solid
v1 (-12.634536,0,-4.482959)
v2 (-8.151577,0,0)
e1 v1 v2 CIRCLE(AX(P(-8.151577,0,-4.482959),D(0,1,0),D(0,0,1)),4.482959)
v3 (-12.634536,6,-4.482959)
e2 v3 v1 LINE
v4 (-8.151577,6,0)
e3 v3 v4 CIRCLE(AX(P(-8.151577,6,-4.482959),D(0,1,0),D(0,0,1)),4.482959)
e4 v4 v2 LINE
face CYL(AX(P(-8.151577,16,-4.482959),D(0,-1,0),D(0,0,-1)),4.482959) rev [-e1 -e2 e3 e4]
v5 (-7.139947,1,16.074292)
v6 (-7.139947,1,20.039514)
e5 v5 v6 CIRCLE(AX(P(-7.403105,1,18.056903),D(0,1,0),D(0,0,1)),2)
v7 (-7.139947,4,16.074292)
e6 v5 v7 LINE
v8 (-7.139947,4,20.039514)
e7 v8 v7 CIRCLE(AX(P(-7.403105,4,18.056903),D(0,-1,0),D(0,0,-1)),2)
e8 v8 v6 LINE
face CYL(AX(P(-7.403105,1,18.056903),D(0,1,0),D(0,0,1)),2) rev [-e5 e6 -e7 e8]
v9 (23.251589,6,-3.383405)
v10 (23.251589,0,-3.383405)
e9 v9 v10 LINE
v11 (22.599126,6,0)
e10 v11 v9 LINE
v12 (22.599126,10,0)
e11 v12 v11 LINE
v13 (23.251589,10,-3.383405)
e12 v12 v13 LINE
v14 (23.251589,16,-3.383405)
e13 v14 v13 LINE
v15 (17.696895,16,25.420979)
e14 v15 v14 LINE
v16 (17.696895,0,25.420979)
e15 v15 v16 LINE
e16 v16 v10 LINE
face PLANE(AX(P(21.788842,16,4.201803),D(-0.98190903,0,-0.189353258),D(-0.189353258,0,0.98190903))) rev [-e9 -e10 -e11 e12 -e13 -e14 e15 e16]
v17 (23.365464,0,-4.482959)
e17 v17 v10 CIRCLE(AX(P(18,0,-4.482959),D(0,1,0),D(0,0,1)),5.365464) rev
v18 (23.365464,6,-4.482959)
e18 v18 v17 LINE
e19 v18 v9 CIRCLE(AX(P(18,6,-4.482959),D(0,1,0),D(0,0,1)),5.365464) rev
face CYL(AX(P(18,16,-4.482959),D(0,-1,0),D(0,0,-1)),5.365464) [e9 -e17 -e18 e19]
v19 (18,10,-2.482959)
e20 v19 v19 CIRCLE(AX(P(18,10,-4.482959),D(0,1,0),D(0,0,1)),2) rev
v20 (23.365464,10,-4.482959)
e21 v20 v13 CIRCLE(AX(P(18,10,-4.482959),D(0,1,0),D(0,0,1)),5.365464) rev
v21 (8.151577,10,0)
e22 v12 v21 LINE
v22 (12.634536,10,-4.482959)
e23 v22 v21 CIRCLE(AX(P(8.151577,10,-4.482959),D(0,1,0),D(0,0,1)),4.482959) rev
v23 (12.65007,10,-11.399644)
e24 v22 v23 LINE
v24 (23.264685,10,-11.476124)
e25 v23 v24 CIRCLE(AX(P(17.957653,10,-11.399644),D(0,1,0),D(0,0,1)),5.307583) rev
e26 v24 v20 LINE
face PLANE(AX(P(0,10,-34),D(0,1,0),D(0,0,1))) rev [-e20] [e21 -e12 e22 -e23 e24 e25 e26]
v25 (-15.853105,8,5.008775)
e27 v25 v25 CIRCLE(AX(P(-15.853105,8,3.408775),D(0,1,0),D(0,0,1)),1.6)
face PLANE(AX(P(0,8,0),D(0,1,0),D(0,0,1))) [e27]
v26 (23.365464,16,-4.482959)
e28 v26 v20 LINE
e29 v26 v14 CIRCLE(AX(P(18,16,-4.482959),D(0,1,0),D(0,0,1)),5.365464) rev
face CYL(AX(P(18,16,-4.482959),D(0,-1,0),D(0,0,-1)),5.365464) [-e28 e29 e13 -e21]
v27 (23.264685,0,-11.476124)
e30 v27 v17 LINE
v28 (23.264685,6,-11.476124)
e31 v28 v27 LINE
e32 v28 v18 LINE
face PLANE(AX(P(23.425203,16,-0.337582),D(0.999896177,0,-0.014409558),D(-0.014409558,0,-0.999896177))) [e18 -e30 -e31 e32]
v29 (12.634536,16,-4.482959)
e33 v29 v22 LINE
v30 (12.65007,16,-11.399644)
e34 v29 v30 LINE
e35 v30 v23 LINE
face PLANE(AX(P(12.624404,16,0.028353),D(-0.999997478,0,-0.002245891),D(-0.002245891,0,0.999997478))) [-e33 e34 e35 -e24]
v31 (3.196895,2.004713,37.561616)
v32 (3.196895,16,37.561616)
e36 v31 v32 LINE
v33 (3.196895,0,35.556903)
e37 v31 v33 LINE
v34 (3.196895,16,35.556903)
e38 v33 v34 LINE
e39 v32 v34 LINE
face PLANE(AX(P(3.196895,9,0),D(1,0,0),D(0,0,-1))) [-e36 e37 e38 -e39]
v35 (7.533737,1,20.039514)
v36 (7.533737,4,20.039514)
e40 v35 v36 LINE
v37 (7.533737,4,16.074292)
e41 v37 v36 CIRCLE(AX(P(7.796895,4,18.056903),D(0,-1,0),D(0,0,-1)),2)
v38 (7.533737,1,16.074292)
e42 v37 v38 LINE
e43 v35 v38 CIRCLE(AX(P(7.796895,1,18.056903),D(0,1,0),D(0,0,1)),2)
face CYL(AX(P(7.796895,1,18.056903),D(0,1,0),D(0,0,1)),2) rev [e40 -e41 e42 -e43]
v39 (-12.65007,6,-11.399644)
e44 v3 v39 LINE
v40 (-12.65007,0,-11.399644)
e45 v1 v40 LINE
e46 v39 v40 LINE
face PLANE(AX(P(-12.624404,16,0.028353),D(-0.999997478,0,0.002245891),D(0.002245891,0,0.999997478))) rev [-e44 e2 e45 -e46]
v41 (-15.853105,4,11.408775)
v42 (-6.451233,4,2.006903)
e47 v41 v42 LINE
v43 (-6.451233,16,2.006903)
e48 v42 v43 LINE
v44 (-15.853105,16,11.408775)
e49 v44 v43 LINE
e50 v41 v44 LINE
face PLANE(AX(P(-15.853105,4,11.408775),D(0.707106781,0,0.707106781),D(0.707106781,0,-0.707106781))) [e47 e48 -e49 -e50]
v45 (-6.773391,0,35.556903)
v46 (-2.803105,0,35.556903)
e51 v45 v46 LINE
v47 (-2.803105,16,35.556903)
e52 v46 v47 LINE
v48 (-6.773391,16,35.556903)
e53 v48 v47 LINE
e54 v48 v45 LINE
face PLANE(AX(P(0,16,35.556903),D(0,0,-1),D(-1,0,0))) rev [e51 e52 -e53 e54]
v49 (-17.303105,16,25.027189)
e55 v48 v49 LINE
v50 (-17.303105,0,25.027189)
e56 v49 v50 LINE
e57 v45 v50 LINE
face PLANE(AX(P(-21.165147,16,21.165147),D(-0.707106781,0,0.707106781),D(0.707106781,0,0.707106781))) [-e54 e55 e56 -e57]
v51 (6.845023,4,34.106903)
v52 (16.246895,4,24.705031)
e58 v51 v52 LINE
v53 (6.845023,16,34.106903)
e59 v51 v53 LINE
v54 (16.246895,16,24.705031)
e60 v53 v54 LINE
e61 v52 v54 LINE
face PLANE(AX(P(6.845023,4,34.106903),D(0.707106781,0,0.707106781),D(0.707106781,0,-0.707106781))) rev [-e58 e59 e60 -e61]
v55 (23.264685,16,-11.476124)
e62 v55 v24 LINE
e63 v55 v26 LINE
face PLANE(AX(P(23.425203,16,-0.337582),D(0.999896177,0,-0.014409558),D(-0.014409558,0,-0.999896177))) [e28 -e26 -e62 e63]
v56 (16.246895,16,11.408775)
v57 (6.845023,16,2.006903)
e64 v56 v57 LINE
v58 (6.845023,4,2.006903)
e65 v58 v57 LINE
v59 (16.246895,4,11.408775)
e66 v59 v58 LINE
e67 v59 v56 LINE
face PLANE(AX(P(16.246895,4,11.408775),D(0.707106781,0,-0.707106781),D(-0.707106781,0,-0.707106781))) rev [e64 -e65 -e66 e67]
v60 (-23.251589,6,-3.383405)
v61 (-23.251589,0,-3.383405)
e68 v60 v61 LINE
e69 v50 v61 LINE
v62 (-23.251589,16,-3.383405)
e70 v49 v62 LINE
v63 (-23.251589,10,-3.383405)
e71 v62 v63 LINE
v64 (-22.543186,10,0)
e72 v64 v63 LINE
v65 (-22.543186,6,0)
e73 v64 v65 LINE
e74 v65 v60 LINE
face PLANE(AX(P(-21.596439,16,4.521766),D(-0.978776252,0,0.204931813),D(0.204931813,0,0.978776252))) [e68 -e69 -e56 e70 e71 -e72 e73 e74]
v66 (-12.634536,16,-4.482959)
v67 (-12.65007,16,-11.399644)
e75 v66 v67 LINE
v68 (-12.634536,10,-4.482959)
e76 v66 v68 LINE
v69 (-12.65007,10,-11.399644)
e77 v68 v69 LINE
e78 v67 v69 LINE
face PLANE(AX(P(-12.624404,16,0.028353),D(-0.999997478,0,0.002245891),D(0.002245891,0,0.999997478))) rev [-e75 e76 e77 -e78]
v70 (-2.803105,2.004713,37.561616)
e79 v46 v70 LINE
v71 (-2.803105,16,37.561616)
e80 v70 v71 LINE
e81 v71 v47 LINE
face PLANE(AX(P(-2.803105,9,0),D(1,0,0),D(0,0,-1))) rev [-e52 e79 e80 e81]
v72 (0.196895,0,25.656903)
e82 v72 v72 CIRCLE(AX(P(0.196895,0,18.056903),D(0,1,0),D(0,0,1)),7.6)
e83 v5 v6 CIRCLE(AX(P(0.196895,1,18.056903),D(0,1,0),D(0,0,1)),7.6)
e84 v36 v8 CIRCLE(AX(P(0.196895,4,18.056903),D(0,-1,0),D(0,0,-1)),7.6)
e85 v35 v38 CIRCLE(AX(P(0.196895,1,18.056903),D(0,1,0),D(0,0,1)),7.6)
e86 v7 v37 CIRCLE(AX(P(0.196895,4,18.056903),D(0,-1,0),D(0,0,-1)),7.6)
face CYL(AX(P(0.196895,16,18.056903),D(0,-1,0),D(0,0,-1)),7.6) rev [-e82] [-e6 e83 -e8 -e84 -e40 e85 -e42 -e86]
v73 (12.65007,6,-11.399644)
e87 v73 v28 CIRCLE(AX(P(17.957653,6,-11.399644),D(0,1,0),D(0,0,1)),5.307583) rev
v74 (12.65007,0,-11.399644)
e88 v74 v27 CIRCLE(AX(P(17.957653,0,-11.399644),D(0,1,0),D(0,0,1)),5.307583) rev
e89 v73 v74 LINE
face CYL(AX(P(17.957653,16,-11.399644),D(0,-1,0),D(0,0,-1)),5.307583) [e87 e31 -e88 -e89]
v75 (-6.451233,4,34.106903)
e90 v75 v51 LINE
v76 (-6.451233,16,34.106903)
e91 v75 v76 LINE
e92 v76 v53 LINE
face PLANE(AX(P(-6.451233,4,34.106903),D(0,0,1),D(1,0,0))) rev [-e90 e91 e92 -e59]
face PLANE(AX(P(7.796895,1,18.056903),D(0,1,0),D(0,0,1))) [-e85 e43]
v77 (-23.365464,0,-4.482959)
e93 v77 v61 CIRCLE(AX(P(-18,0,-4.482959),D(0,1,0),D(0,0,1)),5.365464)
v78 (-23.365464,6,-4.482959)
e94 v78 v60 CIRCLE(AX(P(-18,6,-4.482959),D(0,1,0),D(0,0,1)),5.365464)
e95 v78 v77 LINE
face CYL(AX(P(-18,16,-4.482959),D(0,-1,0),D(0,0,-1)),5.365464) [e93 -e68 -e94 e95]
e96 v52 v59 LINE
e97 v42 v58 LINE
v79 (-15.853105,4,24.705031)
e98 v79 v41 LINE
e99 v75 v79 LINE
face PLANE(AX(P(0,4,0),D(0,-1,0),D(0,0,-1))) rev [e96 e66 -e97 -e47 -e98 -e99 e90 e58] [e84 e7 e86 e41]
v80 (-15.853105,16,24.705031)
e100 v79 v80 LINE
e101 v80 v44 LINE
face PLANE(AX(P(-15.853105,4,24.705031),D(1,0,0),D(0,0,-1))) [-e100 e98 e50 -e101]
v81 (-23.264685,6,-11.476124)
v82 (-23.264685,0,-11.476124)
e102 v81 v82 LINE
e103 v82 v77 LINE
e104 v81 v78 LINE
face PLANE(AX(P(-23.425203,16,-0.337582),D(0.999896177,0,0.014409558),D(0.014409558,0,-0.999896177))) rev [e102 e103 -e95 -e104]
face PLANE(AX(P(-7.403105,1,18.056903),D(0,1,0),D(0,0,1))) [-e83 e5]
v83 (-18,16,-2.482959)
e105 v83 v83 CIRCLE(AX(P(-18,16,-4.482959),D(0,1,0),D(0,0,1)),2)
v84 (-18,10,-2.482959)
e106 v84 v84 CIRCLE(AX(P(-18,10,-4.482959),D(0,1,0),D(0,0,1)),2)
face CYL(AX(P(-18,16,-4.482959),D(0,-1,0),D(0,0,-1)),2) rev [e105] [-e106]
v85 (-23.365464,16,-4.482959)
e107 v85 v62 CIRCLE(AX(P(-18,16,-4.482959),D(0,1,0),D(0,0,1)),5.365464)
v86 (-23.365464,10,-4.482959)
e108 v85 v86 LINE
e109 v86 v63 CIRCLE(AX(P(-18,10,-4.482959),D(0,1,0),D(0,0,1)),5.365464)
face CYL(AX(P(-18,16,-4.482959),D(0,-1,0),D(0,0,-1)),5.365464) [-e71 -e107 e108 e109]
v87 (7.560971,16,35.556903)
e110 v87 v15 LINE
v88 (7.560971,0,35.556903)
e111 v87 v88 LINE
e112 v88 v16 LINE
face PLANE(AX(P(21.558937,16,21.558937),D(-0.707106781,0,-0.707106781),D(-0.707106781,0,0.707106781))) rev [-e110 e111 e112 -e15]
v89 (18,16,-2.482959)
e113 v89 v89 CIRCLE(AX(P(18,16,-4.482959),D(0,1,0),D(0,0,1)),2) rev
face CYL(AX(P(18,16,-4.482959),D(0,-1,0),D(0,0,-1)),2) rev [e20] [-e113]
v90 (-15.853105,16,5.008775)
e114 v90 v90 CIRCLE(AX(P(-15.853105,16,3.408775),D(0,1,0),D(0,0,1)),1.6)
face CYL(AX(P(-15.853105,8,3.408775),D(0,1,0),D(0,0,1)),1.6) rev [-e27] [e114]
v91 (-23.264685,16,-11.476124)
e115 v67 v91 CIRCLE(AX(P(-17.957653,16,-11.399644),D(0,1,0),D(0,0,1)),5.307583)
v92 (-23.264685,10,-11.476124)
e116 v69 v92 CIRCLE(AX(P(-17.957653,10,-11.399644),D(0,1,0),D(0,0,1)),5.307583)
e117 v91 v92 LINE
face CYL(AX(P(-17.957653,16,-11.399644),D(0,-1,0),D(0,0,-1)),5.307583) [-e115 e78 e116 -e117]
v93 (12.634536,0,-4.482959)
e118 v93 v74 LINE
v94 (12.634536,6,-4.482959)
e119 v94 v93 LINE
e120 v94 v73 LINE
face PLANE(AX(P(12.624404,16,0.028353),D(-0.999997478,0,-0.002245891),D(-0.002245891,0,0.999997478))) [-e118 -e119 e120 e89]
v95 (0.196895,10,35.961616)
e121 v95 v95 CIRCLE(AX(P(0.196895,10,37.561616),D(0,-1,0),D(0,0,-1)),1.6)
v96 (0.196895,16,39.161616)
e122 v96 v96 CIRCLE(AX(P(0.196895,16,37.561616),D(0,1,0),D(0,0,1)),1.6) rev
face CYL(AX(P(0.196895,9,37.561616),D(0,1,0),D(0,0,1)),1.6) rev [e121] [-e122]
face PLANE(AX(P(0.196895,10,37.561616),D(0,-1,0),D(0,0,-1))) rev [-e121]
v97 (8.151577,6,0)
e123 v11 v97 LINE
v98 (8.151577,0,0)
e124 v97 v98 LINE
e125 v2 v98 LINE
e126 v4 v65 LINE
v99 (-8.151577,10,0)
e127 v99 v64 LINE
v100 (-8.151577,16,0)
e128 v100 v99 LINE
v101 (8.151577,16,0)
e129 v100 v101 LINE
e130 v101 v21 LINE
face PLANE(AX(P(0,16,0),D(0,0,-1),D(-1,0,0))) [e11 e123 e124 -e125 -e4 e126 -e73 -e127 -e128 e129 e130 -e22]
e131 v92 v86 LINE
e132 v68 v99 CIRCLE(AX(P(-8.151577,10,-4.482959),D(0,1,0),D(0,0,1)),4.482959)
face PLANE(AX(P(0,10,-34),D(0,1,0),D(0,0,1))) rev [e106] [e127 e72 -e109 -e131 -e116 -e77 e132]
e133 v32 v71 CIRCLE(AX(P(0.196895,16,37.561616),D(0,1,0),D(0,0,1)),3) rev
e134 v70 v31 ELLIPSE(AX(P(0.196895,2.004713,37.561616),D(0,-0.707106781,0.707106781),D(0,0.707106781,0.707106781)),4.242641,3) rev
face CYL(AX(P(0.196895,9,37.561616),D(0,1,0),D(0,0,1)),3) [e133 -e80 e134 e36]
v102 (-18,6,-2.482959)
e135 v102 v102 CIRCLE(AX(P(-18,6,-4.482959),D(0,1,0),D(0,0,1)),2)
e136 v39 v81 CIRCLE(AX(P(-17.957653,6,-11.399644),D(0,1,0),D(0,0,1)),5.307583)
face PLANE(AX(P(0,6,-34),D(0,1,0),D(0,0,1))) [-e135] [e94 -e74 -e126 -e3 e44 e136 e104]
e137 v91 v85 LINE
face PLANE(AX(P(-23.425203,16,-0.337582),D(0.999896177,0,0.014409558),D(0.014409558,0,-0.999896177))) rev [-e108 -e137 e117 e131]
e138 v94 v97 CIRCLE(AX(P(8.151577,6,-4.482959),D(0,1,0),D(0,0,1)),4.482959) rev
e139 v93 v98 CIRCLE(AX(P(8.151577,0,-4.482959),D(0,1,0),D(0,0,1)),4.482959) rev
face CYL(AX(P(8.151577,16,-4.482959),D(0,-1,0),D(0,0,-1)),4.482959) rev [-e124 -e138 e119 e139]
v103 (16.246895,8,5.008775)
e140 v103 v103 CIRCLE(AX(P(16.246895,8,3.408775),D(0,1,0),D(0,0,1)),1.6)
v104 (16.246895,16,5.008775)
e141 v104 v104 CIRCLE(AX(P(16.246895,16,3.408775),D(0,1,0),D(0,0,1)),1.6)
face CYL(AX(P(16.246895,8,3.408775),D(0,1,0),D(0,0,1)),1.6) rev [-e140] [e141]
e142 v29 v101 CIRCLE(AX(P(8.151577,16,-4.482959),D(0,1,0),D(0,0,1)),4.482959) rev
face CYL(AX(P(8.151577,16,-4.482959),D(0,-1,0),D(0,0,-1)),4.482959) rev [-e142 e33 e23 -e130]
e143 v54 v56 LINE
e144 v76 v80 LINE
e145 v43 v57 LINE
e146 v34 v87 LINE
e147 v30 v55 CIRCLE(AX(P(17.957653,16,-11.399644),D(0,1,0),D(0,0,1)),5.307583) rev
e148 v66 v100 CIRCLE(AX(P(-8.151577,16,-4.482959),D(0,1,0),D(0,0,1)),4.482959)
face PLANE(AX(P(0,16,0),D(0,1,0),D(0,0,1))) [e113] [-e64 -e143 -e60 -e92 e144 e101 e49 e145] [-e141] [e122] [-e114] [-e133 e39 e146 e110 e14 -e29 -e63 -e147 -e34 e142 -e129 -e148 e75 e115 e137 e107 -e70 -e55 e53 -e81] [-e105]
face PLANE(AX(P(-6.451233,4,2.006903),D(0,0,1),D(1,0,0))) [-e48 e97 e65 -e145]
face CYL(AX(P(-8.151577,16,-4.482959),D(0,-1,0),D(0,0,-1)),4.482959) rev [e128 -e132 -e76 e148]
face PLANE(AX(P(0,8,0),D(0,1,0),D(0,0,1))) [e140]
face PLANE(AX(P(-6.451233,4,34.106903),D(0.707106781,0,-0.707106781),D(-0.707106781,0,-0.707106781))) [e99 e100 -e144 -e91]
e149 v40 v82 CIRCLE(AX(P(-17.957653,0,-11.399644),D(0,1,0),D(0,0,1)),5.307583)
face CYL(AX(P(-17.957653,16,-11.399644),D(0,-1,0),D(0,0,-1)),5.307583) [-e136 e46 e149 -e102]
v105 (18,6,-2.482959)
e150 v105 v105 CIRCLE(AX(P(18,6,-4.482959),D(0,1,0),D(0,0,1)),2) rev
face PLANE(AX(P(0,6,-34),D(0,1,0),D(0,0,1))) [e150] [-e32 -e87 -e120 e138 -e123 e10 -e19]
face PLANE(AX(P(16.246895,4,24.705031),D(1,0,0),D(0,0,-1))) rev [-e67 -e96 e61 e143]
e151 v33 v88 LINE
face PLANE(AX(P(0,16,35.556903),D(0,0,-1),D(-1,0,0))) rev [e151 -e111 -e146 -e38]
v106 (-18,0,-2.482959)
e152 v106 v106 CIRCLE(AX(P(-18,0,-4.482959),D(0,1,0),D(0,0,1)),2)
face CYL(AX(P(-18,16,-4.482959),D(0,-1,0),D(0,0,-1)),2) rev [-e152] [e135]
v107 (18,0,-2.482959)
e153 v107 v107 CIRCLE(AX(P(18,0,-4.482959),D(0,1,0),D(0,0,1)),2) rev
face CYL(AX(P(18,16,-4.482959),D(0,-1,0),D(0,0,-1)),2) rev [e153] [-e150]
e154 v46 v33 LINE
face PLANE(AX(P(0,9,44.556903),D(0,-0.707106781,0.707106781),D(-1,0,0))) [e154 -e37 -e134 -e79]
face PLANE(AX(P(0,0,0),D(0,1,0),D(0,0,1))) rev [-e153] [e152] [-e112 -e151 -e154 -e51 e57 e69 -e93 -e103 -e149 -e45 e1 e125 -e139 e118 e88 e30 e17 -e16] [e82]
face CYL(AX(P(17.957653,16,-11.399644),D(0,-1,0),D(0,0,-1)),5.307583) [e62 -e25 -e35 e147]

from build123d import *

# Parameters (mm, degrees)
SKETCH1_R            = 7.6
SKETCH1_R_2          = 2
BOSS_EXTRUDE2_DEPTH  = 16
CUT_EXTRUDE1_DEPTH   = 12
SKETCH3_R            = 2
CUT_EXTRUDE2_DEPTH   = 3
SKETCH4_W            = 19.148912363
SKETCH4_H            = 4
SKETCH4_W_2          = 1.506114963
SKETCH4_H_2          = 2
SKETCH4_W_3          = 17.088400717
CUT_EXTRUDE3_DEPTH   = 34
SKETCH5_R            = 1.6
CUT_EXTRUDE4_DEPTH   = 8
SKETCH6_R            = 1.6
BOSS_EXTRUDE4_DEPTH  = 7
BOSS_EXTRUDE7_START  = -1
SKETCH9_R            = 1.6
BOSS_EXTRUDE7_DEPTH  = 1
CHAMFER2_START       = 5.004712753
CHAMFER2_DEPTH       = 3.995287247
CHAMFER2_2_DEPTH     = 5.004712753
CHAMFER2_START_2     = -28.681393589
CHAMFER2_3_OUTLINE_W = 6
CHAMFER2_3_OUTLINE_H = 10
CHAMFER2_3_DEPTH     = 3.538866325


with BuildPart() as part:
    # Sketch1 → Boss-Extrude2 (new body)
    with BuildSketch(Plane(origin=(0, 0, 0), x_dir=(1, 0, 0), z_dir=(0, 1, 0))):
        with BuildLine():
            Line((-6.773390856, -35.556903049), (7.560970701, -35.556903049))
            Line((7.560970701, -35.556903049), (17.696894961, -25.420978788))
            Line((17.696894961, -25.420978788), (23.251588719, 3.383405224))
            ThreePointArc((23.251588719, 3.383405224), (23.336919229, 3.930241848), (23.365463973, 4.482959485))
            Line((23.365463973, 4.482959485), (23.363235853, 4.637571356))
            Line((23.363235853, 4.637571356), (23.264685107, 11.476123671))
            ThreePointArc((23.264685107, 11.476123671), (21.66723092, 15.195624527), (17.911941271, 16.707029882))
            ThreePointArc((17.911941271, 16.707029882), (14.188498301, 15.136475123), (12.650070184, 11.399643748))
            Line((12.650070184, 11.399643748), (12.634536027, 4.482959485))
            ThreePointArc((12.634536027, 4.482959485), (11.321507594, 1.313028433), (8.151576542, 0))
            Line((8.151576542, 0), (7.167180778, 0))
            Line((7.167180778, 0), (0, 0))
            Line((0, 0), (-7.167180778, 0))
            Line((-7.167180778, 0), (-8.151576542, 0))
            ThreePointArc((-8.151576542, 0), (-11.321507594, 1.313028433), (-12.634536027, 4.482959485))
            Line((-12.634536027, 4.482959485), (-12.650070184, 11.399643748))
            ThreePointArc((-12.650070184, 11.399643748), (-14.188498301, 15.136475123), (-17.911941271, 16.707029882))
            ThreePointArc((-17.911941271, 16.707029882), (-21.66723092, 15.195624527), (-23.264685107, 11.476123671))
            Line((-23.264685107, 11.476123671), (-23.363235853, 4.637571356))
            Line((-23.363235853, 4.637571356), (-23.365463973, 4.482959485))
            ThreePointArc((-23.365463973, 4.482959485), (-23.336919229, 3.930241848), (-23.251588719, 3.383405224))
            Line((-23.251588719, 3.383405224), (-17.303105039, -25.027188866))
            Line((-17.303105039, -25.027188866), (-6.773390856, -35.556903049))
        make_face()
        with Locations(Location((0.196894961, -18.056903049, 0), (0, 0, 270))):
            Circle(SKETCH1_R, mode=Mode.SUBTRACT)
        with Locations(Location((-18, 4.482959485, 0), (0, 0, 270))):
            Circle(SKETCH1_R_2, mode=Mode.SUBTRACT)
        with Locations(Location((18, 4.482959485, 0), (0, 0, 270))):
            Circle(SKETCH1_R_2, mode=Mode.SUBTRACT)
    extrude(amount=BOSS_EXTRUDE2_DEPTH)

    # Sketch2 → Cut-Extrude1 (cut)
    with BuildSketch(Plane(origin=(0, 16, 0), x_dir=(1, 0, 0), z_dir=(0, 1, 0))):
        Polygon((-6.451232715, -34.106903049), (6.845022637, -34.106903049), (16.246894961, -24.705030725), (16.246894961, -11.408775373), (6.845022637, -2.006903049), (-6.451232715, -2.006903049), (-15.853105039, -11.408775373), (-15.853105039, -24.705030725), align=None)
    extrude(amount=-CUT_EXTRUDE1_DEPTH, mode=Mode.SUBTRACT)

    # Sketch3 → Cut-Extrude2 (cut)
    with BuildSketch(Plane(origin=(0, 4, 0), x_dir=(1, 0, 0), z_dir=(0, 1, 0))):
        with Locations((7.796894961, -18.056903049)):
            Circle(SKETCH3_R)
        with Locations((-7.403105039, -18.056903049)):
            Circle(SKETCH3_R)
    extrude(amount=-CUT_EXTRUDE2_DEPTH, mode=Mode.SUBTRACT)

    # Sketch4 → Cut-Extrude3 (cut)
    with BuildSketch(Plane(origin=(0, 0, 0), x_dir=(-1, 0, 0), z_dir=(0, 0, -1))):
        with Locations((17.726032724, 8)):
            Rectangle(SKETCH4_W, SKETCH4_H)
        Polygon((8.151576542, 10), (1.506114963, 10), (1.506114963, 8), (1.506114963, 6), (8.151576542, 6), align=None)
        Polygon((0, 8), (0, 10), (-8.151576542, 10), (-8.151576542, 6), (0, 6), align=None)
        with Locations((0.753057482, 9)):
            Rectangle(SKETCH4_W_2, SKETCH4_H_2)
        with Locations((0.753057482, 7)):
            Rectangle(SKETCH4_W_2, SKETCH4_H_2)
        with Locations((-16.695776901, 8)):
            Rectangle(SKETCH4_W_3, SKETCH4_H)
    extrude(amount=CUT_EXTRUDE3_DEPTH, mode=Mode.SUBTRACT)

    # Sketch5 → Cut-Extrude4 (cut)
    with BuildSketch(Plane(origin=(0, 16, 0), x_dir=(1, 0, 0), z_dir=(0, 1, 0))):
        with Locations(Location((16.246894961, -3.408775373, 0), (0, 0, 270))):
            Circle(SKETCH5_R)
        with Locations(Location((-15.853105039, -3.408775373, 0), (0, 0, 270))):
            Circle(SKETCH5_R)
    extrude(amount=-CUT_EXTRUDE4_DEPTH, mode=Mode.SUBTRACT)

    # Sketch6 → Boss-Extrude4 (add)
    with BuildSketch(Plane(origin=(0, 16, 0), x_dir=(1, 0, 0), z_dir=(0, 1, 0))):
        with BuildLine():
            Line((3.196894961, -35.556903049), (-2.803105039, -35.556903049))
            Line((-2.803105039, -35.556903049), (-2.803105039, -37.561615802))
            ThreePointArc((-2.803105039, -37.561615802), (0.196894961, -40.561615802), (3.196894961, -37.561615802))
            Line((3.196894961, -37.561615802), (3.196894961, -35.556903049))
        make_face()
        with Locations(Location((0.196894961, -37.561615802, 0), (0, 0, 270))):
            Circle(SKETCH6_R, mode=Mode.SUBTRACT)
    extrude(amount=-BOSS_EXTRUDE4_DEPTH)

    # Sketch9 → Boss-Extrude7 (add)
    with BuildSketch(Plane.XZ.offset(-9).offset(BOSS_EXTRUDE7_START)):
        with Locations(Location((0.196894961, 37.561615802, 0), (0, 0, 90))):
            Circle(SKETCH9_R)
    extrude(amount=BOSS_EXTRUDE7_DEPTH)

    # Chamfer2: read off the stored shape, not the designer's step
    # Chamfer2 outline → Chamfer2 (add)
    with BuildSketch(Plane(origin=(0, 0, 0), x_dir=(1, 0, 0), z_dir=(0, 1, 0)).offset(CHAMFER2_START)):
        with BuildLine():
            ThreePointArc((-2.803105039, -37.561615802), (0.196894961, -40.561615802), (3.196894961, -37.561615802))
            Line((3.196894961, -37.561615802), (3.196894961, -35.556903049))
            Line((3.196894961, -35.556903049), (-2.803105039, -35.556903049))
            Line((-2.803105039, -35.556903049), (-2.803105039, -37.561615802))
        make_face()
    extrude(amount=CHAMFER2_DEPTH)

    # Chamfer2 2 outline → Chamfer2 2 (add)
    with BuildSketch(Plane(origin=(0, 0, 0), x_dir=(1, 0, 0), z_dir=(0, 1, 0))):
        with BuildLine():
            ThreePointArc((-2.803105039, -37.561615802), (0.196894961, -40.561615802), (3.196894961, -37.561615802))
            Line((3.196894961, -37.561615802), (3.196894961, -35.556903049))
            Line((3.196894961, -35.556903049), (-2.803105039, -35.556903049))
            Line((-2.803105039, -35.556903049), (-2.803105039, -37.561615802))
        make_face()
    extrude(amount=CHAMFER2_2_DEPTH)

    # Chamfer2 3 outline → Chamfer2 3 (cut)
    with BuildSketch(Plane(origin=(0, 0, 0), x_dir=(1, 0, 0), z_dir=(0, 0.7071067811865511, -0.7071067811865441)).offset(CHAMFER2_START_2)):
        with Locations((0.196894961, -29)):
            Rectangle(CHAMFER2_3_OUTLINE_W, CHAMFER2_3_OUTLINE_H)
    extrude(amount=CHAMFER2_3_DEPTH, mode=Mode.SUBTRACT)


solid = part.part
